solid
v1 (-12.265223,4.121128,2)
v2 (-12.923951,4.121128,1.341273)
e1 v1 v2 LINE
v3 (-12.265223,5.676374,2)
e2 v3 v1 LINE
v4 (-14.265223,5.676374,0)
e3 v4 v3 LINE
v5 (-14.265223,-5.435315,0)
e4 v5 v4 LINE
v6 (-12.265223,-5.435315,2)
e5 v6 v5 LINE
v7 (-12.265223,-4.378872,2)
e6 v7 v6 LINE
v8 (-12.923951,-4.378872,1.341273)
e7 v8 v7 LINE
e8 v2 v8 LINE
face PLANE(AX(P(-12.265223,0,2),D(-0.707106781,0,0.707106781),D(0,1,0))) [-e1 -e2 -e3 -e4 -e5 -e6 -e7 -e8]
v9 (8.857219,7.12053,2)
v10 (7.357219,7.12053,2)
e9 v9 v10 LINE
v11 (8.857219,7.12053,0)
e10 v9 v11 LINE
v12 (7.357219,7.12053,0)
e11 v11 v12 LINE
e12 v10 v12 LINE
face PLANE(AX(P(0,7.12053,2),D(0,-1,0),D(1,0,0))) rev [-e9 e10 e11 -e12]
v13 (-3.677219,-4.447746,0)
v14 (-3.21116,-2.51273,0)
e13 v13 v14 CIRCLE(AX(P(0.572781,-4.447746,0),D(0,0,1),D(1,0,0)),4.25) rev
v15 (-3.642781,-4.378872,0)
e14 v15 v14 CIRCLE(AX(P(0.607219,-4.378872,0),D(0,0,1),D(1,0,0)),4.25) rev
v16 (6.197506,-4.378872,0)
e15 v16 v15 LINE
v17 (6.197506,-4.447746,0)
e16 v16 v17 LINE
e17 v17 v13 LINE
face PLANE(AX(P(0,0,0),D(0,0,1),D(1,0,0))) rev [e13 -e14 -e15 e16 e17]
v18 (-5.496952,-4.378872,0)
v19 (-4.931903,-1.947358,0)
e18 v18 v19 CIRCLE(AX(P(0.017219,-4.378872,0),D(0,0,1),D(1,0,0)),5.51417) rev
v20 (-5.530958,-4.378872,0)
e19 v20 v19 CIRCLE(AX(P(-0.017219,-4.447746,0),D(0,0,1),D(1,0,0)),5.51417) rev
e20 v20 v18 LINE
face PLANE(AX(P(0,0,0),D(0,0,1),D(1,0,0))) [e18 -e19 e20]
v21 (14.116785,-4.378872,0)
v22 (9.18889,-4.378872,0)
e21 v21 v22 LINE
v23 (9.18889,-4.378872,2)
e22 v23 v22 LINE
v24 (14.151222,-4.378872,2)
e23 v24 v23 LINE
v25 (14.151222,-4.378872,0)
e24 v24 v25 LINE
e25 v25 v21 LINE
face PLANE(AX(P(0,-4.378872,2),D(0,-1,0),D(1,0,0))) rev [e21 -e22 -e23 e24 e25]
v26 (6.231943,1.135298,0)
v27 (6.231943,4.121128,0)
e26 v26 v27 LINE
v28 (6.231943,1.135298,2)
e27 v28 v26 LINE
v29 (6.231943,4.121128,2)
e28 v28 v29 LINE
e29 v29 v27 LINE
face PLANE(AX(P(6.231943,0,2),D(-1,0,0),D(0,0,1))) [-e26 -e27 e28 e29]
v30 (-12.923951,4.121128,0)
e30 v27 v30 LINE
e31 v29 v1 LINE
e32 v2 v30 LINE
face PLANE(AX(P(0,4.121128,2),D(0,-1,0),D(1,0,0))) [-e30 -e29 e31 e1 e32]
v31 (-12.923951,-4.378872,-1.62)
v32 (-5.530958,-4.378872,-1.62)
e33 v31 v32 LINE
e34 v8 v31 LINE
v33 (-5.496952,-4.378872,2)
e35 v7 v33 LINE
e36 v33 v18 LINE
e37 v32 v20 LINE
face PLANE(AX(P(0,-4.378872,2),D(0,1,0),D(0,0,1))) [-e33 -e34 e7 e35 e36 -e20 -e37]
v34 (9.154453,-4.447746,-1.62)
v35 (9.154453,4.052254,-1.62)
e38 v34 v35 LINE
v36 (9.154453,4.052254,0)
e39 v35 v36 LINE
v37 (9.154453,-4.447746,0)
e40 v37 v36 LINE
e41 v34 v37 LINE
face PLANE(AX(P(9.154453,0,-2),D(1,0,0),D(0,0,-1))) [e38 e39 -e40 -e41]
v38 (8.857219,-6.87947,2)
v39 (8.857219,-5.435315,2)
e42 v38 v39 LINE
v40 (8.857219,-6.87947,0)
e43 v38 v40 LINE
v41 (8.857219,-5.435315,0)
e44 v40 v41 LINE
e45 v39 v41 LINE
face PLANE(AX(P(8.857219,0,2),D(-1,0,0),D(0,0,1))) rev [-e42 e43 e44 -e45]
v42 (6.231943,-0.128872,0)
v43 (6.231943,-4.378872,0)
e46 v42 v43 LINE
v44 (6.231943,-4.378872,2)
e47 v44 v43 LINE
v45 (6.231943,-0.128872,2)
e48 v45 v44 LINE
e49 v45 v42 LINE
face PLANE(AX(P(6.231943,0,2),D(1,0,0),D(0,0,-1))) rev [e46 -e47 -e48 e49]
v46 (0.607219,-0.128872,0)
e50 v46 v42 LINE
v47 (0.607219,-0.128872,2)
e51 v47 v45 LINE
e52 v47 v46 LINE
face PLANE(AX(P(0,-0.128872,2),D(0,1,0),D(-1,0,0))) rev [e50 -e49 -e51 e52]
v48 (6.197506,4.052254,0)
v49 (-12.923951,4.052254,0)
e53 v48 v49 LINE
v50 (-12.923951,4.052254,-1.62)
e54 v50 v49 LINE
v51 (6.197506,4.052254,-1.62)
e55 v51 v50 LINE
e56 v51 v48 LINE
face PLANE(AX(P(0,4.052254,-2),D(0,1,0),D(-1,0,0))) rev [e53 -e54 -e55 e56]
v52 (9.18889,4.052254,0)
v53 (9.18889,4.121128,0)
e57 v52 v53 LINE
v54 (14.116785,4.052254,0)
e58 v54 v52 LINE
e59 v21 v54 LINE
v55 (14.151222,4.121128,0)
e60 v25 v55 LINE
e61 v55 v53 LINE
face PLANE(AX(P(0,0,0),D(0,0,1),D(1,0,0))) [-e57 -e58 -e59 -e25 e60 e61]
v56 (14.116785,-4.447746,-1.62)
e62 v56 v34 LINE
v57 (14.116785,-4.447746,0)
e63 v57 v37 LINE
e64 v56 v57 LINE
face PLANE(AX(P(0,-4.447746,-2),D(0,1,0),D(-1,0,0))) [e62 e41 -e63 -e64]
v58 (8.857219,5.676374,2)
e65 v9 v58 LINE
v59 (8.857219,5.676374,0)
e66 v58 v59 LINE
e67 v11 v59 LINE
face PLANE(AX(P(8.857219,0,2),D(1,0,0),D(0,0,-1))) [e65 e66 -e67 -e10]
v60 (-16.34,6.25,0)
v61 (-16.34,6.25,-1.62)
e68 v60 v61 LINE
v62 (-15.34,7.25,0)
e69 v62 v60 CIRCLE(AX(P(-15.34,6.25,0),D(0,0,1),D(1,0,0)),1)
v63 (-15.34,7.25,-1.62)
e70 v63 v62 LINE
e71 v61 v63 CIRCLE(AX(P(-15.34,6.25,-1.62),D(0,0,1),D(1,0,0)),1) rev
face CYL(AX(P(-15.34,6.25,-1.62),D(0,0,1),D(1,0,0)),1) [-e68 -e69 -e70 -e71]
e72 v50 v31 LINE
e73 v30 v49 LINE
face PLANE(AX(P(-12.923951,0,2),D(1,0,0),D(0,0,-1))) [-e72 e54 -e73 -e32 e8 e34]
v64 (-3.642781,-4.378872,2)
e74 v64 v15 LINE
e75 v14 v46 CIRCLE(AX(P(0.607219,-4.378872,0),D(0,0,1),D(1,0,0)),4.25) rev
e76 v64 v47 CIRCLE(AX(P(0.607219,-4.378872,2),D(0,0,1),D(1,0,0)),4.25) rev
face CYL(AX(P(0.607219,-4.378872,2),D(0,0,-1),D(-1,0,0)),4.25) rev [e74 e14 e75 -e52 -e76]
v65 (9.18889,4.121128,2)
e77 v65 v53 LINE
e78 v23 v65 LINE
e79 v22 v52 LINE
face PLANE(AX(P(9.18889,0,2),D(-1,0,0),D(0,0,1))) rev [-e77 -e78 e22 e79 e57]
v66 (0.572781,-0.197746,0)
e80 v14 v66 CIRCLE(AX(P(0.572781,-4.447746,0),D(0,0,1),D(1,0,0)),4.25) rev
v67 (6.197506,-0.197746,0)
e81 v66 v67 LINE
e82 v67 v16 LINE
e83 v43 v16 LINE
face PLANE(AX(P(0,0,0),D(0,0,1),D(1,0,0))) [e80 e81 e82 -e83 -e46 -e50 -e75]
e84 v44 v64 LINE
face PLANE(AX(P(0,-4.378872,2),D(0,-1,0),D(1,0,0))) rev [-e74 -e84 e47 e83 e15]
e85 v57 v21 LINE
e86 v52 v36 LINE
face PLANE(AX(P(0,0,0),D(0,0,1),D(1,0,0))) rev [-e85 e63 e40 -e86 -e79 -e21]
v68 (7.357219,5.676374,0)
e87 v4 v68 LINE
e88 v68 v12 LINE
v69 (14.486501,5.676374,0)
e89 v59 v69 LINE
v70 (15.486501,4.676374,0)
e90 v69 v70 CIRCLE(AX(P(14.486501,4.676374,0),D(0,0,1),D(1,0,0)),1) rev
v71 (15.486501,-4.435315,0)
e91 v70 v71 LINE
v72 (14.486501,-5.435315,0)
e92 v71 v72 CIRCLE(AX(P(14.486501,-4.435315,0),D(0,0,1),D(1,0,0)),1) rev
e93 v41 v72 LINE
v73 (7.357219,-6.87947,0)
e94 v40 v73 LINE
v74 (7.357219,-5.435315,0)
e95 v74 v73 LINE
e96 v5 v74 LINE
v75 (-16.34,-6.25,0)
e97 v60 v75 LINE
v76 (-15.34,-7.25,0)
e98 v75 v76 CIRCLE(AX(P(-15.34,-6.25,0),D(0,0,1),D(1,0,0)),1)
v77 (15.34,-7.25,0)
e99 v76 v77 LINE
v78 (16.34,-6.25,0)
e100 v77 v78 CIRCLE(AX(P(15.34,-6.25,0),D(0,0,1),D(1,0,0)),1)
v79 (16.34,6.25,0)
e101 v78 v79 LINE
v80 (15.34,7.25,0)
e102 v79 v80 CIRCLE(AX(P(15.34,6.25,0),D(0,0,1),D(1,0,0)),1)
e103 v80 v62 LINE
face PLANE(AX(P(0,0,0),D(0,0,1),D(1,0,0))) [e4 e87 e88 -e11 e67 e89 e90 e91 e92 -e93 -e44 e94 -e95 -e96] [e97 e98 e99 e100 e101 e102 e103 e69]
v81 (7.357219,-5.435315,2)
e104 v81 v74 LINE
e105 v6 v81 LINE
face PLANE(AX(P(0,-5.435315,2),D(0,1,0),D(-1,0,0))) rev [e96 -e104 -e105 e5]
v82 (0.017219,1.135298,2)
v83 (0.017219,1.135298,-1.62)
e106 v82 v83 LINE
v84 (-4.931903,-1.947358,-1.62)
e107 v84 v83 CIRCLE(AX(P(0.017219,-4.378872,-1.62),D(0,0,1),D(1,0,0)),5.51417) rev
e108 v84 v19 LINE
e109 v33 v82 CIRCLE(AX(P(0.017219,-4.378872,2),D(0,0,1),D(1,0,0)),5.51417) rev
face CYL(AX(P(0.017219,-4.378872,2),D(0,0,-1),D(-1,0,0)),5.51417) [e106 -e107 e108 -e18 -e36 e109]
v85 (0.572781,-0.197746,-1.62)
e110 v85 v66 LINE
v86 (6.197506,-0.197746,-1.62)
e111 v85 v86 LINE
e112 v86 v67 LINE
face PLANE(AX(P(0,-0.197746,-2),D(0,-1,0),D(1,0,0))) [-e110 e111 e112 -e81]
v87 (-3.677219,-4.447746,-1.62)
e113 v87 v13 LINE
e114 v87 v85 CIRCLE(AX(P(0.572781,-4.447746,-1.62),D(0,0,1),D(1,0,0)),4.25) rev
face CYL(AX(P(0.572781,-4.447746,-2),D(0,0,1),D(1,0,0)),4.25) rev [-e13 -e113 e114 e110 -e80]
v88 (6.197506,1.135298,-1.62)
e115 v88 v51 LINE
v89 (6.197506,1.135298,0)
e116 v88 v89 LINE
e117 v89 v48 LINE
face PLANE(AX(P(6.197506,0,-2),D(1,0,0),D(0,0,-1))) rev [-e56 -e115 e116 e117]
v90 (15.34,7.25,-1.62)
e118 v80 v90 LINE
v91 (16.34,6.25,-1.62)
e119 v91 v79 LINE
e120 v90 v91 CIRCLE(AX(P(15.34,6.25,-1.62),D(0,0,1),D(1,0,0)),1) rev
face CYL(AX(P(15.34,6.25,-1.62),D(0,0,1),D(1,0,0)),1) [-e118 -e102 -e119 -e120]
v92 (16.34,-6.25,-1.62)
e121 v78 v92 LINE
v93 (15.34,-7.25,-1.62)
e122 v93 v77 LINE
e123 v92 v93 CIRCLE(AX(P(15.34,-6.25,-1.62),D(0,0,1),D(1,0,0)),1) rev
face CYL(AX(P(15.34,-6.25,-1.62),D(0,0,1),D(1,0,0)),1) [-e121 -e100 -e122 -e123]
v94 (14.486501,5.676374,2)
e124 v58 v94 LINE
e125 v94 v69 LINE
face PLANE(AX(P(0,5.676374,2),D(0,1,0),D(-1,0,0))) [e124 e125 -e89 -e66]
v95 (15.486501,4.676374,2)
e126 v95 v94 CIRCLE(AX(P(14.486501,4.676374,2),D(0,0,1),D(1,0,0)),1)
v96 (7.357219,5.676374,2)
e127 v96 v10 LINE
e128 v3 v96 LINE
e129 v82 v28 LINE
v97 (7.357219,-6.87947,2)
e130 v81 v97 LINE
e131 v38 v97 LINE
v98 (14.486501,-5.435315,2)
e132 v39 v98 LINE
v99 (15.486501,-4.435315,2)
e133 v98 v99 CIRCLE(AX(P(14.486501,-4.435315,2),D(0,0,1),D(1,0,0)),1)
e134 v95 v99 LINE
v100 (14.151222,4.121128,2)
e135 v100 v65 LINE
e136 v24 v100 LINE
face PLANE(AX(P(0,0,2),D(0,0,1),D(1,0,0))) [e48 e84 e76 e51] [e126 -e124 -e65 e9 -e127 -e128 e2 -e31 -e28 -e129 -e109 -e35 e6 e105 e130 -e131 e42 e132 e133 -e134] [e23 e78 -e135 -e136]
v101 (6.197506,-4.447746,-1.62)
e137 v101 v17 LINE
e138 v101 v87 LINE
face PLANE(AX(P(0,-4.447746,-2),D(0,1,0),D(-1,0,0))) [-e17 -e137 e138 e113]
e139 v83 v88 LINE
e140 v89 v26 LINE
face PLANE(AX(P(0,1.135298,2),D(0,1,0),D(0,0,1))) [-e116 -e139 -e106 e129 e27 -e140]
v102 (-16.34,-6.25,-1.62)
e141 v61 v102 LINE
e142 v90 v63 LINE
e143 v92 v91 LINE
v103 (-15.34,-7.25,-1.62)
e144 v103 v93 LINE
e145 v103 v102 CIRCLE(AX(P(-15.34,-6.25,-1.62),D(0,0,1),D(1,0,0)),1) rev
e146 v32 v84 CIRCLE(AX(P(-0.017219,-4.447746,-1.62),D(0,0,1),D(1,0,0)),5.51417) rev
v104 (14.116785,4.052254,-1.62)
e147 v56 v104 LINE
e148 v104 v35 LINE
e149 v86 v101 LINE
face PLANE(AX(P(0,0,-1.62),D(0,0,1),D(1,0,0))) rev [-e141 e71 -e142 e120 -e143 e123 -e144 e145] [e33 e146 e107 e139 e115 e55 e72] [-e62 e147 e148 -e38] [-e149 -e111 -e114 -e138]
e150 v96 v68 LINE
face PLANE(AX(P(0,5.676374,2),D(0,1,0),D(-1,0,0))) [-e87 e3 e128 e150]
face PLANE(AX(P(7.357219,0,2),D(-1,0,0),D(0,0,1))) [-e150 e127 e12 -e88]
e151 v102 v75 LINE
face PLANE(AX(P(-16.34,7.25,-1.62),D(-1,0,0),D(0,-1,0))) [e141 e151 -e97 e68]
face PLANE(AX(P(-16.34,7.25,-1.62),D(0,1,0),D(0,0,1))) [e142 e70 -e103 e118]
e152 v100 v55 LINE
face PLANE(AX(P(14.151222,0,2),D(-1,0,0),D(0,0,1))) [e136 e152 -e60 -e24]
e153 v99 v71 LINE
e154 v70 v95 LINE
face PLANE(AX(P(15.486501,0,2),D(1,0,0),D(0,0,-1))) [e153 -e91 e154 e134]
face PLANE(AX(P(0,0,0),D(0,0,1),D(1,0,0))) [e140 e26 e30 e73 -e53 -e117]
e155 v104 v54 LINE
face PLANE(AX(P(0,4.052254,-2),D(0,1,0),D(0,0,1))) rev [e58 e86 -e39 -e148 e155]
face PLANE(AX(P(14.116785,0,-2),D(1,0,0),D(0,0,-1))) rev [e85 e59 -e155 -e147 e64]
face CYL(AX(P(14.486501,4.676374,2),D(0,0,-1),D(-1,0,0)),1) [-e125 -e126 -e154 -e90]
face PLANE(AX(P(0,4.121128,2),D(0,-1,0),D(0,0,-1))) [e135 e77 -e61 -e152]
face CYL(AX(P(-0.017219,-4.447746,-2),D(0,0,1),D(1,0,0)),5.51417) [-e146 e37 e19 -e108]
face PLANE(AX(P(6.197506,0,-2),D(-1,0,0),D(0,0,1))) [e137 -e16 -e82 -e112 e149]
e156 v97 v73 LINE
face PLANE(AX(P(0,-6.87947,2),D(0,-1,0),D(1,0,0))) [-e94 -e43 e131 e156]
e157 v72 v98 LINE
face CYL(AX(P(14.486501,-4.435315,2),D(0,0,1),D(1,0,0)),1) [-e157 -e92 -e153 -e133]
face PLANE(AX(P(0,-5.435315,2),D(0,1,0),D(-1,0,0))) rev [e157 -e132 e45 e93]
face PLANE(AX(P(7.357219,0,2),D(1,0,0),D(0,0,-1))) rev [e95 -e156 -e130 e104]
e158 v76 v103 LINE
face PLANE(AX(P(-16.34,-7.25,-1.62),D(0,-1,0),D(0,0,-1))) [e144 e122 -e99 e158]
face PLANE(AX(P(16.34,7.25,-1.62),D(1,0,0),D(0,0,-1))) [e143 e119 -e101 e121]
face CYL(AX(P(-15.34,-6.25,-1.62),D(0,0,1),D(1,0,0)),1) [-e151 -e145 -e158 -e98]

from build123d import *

# Parameters (mm, degrees)
SKETCH1_W           = 32.68
SKETCH1_H           = 14.5
BOSS_EXTRUDE2_DEPTH = 1.62
SKETCH3_W           = 4.962331447
SKETCH3_H           = 8.5
SKETCH3_W_2         = 1.5
SKETCH3_H_2         = 1.444155173
SKETCH3_H_3         = 1.444155172
BOSS_EXTRUDE3_DEPTH = 2
CUT_EXTRUDE1_START  = -2
SKETCH4_W           = 4.962331446
SKETCH4_H           = 8.5
CUT_EXTRUDE1_DEPTH  = 2
FILLET1_R           = 1
CHAMFER1_SIZE       = 2.3


with BuildPart() as part:
    # Sketch1 → Boss-Extrude2 (new body)
    with BuildSketch(Plane.XY):
        Rectangle(SKETCH1_W, SKETCH1_H)
    extrude(amount=-BOSS_EXTRUDE2_DEPTH)

    # Sketch3 → Boss-Extrude3 (add)
    # profile 1 of 3: a face of its own
    with BuildSketch(Plane.XY):
        Polygon((7.357218521, 5.676374473), (-14.565223124, 5.676374473), (-14.565223124, -5.435315182), (7.357218521, -5.435315182), (8.857218521, -5.435315182), (15.486501014, -5.435315182), (15.486501014, 5.676374473), (8.857218521, 5.676374473), align=None)
        with BuildLine():
            Line((6.231943334, 4.121127688), (6.231943334, 2.506027416))
            Line((6.231943334, 2.506027416), (6.231943334, 1.135297756))
            Line((6.231943334, 1.135297756), (0.017218521, 1.135297756))
            ThreePointArc((0.017218521, 1.135297756), (-3.881888527, -0.479765264), (-5.496951548, -4.378872312))
            Line((-5.496951548, -4.378872312), (-12.923950607, -4.378872312))
            Line((-12.923950607, -4.378872312), (-12.923950607, 4.121127688))
            Line((-12.923950607, 4.121127688), (6.231943334, 4.121127688))
        make_face(mode=Mode.SUBTRACT)
        with BuildLine():
            Line((6.231943334, -0.128872312), (6.231943334, -4.378872312))
            Line((6.231943334, -4.378872312), (-3.642781479, -4.378872312))
            ThreePointArc((-3.642781479, -4.378872312), (-2.397985299, -1.373668492), (0.607218521, -0.128872312))
            Line((0.607218521, -0.128872312), (6.231943334, -0.128872312))
        make_face(mode=Mode.SUBTRACT)
        with Locations((11.670056084, -0.128872312)):
            Rectangle(SKETCH3_W, SKETCH3_H, mode=Mode.SUBTRACT)
    # profile 2 of 3: a face of its own
    with BuildSketch(Plane.XY):
        with Locations((8.107218521, -6.157392769)):
            Rectangle(SKETCH3_W_2, SKETCH3_H_2)
    # profile 3 of 3: a face of its own
    with BuildSketch(Plane.XY):
        with Locations((8.107218521, 6.398452059)):
            Rectangle(SKETCH3_W_2, SKETCH3_H_3)
    extrude(amount=BOSS_EXTRUDE3_DEPTH)

    # Sketch4 → Cut-Extrude1 (cut)
    with BuildSketch(Plane.XY.offset(CUT_EXTRUDE1_START)):
        with BuildLine():
            Line((6.197506292, 1.135297756), (6.197506292, 2.437153333))
            Line((6.197506292, 2.437153333), (6.197506292, 4.052253605))
            Line((6.197506292, 4.052253605), (-12.923950607, 4.052253605))
            Line((-12.923950607, 4.052253605), (-12.923950607, -4.378872312))
            Line((-12.923950607, -4.378872312), (-5.530958441, -4.378872312))
            ThreePointArc((-5.530958441, -4.378872312), (-5.371289583, -3.128657844), (-4.931903418, -1.947357645))
            ThreePointArc((-4.931903418, -1.947357645), (-2.898110461, 0.301611474), (0.017218521, 1.135297756))
            Line((0.017218521, 1.135297756), (6.197506292, 1.135297756))
        make_face()
        with BuildLine():
            ThreePointArc((-3.677218521, -4.447746395), (-2.432422341, -1.442542575), (0.572781479, -0.197746395))
            Line((0.572781479, -0.197746395), (6.197506292, -0.197746395))
            Line((6.197506292, -0.197746395), (6.197506292, -4.447746395))
            Line((6.197506292, -4.447746395), (-3.677218521, -4.447746395))
        make_face()
        with Locations((11.635619042, -0.197746395)):
            Rectangle(SKETCH4_W, SKETCH4_H)
    extrude(amount=CUT_EXTRUDE1_DEPTH, mode=Mode.SUBTRACT)

    # Fillet1
    fillet1_edges = [part.edges().sort_by_distance(p)[0] for p in [
        (15.486501014, -5.435315182, 1),
        (15.486501014, 5.676374473, 1),
        (16.34, -7.25, -0.81),
        (-16.34, -7.25, -0.81),
        (-16.34, 7.25, -0.81),
        (16.34, 7.25, -0.81),
    ]]
    fillet(fillet1_edges, radius=FILLET1_R)

    # Chamfer1
    # the kernel refuses this chamfer: 2.3 mm, written as the material it takes off along each edge
    with BuildSketch(Plane(origin=(-14.565223124, 11.591245345, 2), x_dir=(-0.02749587661058623, 0, -0.9996219169112968), z_dir=(0, -1, 0))) as chamfer1_piece_1_section:
        Polygon((CHAMFER1_SIZE * 0.999621916911, CHAMFER1_SIZE * 0.0274958766106), (-CHAMFER1_SIZE * 0.0274958766106, CHAMFER1_SIZE * 0.999621916911), (0, 0), align=None)
    chamfer1_piece_1 = extrude(amount=22.9414314, mode=Mode.PRIVATE)
    chamfer1_piece_1 = split(chamfer1_piece_1, bisect_by=Plane(origin=(-13.786723821, 0.120529645, 0), z_dir=(0, 0, 1)), keep=Keep.TOP, mode=Mode.PRIVATE)
    add(chamfer1_piece_1, mode=Mode.SUBTRACT)


solid = part.part
